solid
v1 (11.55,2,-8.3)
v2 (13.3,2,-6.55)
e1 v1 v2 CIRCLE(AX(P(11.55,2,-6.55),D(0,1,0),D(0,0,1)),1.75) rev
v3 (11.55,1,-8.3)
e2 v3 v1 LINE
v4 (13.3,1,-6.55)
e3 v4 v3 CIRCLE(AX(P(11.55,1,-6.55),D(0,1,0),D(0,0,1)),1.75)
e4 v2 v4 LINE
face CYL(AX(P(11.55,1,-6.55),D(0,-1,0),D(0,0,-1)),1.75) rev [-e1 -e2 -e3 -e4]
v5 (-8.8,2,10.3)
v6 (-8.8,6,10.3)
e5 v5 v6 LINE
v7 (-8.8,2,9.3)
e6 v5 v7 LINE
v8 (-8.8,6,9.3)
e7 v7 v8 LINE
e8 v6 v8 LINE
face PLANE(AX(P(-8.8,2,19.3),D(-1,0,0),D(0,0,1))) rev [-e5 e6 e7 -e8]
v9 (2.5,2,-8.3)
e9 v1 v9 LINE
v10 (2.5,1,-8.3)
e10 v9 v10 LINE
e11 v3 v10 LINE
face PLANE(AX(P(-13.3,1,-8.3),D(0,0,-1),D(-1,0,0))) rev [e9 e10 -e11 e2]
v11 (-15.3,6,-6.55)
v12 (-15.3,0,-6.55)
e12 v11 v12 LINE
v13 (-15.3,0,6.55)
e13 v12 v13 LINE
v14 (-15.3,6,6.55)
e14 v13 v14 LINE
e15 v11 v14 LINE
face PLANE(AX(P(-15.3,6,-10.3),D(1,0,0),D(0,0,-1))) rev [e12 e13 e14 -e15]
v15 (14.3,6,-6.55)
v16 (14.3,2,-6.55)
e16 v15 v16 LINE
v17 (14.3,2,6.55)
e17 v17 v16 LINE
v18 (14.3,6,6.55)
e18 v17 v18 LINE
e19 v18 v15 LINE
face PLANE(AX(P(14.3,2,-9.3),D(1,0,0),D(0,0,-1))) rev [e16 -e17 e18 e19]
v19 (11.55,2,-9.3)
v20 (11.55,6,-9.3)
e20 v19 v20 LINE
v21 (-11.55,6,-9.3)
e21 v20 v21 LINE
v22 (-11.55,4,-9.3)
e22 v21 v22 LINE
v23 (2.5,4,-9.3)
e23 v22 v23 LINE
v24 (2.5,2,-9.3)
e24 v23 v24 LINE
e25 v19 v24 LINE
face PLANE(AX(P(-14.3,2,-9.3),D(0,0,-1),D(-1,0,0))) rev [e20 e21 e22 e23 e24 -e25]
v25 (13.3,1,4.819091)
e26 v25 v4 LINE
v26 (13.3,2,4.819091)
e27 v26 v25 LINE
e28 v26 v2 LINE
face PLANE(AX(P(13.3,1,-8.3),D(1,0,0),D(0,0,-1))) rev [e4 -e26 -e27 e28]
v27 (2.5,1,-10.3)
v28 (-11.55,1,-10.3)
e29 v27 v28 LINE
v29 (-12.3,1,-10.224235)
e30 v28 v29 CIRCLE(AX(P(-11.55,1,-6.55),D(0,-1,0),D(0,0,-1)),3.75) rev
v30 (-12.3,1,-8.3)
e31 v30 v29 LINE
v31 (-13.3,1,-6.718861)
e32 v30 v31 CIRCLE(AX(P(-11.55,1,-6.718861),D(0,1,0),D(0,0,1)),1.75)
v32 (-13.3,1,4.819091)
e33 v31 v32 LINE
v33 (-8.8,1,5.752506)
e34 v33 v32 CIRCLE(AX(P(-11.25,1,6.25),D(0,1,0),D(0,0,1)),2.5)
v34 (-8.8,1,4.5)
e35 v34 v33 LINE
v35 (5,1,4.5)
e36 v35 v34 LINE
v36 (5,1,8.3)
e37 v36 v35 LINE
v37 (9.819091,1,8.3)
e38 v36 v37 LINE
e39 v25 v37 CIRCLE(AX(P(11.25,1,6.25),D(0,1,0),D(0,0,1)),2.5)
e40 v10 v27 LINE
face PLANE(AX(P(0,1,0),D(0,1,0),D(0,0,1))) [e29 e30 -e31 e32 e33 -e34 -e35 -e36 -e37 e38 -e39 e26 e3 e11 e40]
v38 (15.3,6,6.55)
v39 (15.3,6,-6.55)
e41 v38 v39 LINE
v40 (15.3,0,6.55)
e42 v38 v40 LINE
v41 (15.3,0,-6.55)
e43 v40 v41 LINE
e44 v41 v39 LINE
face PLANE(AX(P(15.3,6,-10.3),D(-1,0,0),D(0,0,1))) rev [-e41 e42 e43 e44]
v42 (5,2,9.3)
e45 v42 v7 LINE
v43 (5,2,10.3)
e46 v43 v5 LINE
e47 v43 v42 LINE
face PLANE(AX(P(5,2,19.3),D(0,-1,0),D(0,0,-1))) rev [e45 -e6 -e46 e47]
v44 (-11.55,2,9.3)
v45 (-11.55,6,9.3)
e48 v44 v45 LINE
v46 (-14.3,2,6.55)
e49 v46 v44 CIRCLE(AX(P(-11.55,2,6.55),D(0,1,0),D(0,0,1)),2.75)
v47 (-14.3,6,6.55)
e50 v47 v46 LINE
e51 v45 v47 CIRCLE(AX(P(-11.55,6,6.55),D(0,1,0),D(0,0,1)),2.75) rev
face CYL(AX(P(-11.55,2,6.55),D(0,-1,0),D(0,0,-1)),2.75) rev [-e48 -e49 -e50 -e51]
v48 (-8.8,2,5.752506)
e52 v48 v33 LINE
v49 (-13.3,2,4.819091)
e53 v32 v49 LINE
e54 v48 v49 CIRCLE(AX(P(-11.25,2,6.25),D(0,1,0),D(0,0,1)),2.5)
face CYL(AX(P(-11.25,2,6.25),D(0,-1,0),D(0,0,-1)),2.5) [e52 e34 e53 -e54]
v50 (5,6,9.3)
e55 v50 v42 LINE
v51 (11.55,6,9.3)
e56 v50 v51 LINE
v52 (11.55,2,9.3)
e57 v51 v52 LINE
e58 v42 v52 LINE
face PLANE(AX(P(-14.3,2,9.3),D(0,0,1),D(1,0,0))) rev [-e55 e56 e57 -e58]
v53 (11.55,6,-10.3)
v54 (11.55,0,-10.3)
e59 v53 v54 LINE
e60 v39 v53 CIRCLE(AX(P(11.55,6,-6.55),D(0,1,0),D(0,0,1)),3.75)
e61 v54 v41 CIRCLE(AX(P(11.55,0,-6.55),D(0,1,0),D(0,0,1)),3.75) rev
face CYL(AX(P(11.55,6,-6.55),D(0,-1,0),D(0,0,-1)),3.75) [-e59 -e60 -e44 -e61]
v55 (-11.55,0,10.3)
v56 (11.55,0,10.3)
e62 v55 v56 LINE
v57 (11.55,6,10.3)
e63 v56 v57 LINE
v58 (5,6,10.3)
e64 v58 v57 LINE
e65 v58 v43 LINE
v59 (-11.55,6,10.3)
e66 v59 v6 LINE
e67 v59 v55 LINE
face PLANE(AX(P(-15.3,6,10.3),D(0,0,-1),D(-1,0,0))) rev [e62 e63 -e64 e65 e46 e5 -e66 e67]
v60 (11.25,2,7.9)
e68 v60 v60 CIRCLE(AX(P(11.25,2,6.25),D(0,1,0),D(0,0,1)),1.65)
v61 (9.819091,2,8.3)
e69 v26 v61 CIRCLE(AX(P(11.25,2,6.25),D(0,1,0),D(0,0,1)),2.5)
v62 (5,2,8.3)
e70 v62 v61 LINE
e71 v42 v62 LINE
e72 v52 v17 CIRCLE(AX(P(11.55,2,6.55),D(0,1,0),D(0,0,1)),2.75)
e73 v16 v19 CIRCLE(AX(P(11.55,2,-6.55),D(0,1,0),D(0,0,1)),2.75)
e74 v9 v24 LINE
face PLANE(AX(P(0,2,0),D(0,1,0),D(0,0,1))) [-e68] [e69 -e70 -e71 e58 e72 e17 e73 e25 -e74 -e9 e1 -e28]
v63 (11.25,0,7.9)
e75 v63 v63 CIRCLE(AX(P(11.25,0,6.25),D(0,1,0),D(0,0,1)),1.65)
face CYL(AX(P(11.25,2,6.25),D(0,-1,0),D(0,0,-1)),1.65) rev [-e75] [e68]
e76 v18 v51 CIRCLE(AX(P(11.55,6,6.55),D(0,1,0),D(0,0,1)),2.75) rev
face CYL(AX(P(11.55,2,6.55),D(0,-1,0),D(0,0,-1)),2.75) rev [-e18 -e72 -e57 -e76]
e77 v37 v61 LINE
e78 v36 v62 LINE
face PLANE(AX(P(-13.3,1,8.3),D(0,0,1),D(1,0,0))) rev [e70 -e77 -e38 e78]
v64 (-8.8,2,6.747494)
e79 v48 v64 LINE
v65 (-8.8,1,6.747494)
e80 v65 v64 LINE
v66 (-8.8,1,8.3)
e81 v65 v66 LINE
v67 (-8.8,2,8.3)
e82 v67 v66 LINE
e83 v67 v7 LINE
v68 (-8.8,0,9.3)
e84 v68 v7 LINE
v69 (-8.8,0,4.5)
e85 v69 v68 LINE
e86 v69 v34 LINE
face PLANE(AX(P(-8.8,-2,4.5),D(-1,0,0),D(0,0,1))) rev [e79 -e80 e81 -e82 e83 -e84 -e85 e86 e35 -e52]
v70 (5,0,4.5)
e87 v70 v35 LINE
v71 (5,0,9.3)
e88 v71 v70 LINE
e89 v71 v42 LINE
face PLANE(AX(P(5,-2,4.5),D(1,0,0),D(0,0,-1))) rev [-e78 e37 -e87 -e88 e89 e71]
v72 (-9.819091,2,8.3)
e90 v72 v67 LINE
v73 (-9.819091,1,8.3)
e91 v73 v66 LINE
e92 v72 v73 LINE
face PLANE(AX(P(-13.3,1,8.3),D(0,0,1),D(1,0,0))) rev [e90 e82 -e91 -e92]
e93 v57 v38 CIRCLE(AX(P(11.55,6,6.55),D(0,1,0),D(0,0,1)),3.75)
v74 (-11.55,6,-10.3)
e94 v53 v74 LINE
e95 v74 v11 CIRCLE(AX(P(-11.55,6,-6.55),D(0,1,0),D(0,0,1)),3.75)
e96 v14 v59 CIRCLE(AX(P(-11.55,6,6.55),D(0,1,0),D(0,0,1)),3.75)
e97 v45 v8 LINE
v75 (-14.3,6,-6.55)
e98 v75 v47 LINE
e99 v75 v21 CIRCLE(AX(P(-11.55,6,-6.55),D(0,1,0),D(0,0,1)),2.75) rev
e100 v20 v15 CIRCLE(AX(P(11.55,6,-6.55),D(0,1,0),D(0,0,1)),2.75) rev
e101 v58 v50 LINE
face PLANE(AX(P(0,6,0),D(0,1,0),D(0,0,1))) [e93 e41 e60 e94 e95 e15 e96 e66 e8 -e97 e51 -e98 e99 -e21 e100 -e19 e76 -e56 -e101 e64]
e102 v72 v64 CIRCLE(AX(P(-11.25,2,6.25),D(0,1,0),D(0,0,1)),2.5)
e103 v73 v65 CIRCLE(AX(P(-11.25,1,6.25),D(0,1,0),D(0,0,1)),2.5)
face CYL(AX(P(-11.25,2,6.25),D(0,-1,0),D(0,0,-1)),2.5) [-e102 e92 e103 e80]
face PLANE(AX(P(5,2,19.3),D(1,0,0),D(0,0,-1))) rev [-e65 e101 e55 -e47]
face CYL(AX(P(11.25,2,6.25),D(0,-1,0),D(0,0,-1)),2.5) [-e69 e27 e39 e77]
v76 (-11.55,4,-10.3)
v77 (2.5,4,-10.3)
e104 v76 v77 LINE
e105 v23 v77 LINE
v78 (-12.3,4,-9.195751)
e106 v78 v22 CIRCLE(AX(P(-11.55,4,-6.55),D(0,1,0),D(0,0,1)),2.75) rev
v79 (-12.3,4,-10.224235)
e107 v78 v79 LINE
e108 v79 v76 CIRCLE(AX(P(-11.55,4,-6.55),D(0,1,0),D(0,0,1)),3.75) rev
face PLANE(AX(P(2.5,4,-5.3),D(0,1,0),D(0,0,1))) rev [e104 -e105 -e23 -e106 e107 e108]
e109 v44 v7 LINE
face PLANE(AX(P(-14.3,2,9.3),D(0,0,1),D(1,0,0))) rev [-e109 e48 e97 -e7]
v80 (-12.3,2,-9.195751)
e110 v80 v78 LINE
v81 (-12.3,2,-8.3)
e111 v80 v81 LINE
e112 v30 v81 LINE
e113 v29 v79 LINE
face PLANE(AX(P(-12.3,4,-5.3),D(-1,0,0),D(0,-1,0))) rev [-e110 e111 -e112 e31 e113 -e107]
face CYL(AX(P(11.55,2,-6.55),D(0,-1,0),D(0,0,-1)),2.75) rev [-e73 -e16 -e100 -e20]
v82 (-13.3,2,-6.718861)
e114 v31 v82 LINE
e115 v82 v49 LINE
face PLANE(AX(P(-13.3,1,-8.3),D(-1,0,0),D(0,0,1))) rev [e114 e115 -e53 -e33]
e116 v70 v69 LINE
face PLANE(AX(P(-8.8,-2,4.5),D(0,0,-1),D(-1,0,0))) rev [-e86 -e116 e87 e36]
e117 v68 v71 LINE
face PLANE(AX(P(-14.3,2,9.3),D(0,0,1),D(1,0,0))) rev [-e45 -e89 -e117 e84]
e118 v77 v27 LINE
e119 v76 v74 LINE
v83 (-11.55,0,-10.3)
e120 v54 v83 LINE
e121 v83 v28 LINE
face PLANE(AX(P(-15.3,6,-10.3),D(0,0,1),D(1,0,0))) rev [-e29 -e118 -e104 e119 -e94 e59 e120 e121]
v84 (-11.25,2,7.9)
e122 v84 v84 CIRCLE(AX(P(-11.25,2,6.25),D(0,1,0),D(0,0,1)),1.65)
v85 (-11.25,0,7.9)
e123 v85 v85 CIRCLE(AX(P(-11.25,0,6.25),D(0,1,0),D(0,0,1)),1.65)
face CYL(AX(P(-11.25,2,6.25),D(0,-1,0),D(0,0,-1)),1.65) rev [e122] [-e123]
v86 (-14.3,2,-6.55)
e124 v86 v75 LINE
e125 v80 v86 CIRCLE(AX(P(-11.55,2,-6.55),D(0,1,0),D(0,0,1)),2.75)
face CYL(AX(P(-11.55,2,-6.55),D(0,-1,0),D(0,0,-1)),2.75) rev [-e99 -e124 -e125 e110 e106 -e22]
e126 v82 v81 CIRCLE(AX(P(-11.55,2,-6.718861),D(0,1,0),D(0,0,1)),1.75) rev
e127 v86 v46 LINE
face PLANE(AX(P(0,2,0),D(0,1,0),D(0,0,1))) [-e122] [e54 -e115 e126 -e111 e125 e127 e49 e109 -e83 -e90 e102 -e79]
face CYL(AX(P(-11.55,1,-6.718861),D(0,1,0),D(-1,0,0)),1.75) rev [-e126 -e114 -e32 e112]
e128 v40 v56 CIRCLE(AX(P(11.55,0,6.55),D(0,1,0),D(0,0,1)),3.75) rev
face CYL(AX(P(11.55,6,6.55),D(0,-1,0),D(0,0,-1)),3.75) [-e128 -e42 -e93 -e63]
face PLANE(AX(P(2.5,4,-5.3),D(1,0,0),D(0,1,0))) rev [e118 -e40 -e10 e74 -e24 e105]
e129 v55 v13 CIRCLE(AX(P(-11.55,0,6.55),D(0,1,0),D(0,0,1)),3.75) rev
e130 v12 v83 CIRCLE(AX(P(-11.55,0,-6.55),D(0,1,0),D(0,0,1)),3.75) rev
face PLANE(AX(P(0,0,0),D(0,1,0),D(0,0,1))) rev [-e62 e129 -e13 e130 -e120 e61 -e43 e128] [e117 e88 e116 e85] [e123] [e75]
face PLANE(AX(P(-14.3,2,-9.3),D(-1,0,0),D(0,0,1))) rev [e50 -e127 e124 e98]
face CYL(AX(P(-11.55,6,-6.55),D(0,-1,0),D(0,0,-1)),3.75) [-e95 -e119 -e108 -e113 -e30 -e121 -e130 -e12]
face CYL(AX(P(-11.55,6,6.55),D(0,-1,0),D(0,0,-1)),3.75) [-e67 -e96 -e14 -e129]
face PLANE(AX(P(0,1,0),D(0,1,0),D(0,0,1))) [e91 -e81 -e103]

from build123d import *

# Parameters (mm, degrees)
SKETCH_1_W          = 30.6
SKETCH_1_H          = 20.6
EXTRUDE_1_DEPTH     = 6
SKETCH_2_W          = 28.6
SKETCH_2_H          = 18.6
CUT_EXTRUDE_1_DEPTH = 4
SKETCH_3_W          = 26.6
SKETCH_3_H          = 16.6
CUT_EXTRUDE_2_DEPTH = 1
FILLET_1_R          = 2.75
FILLET_2_R          = 3.75
SKETCH_4_W          = 14.8
SKETCH_4_H          = 3
CUT_EXTRUDE_3_DEPTH = 5
FILLET_3_R          = 1.75
SKETCH_5_R          = 2.5
SKETCH_5_R_2        = 1.65
EXTRUDE_2_DEPTH     = 1
CUT_EXTRUDE_START   = -2
SKETCH_6_R          = 1.65
CUT_EXTRUDE_4_DEPTH = 2
SKETCH_7_W          = 13.8
SKETCH_7_H          = 4.8
CUT_EXTRUDE_5_DEPTH = 8
SKETCH_8_W          = 13.8
SKETCH_8_H          = 4
CUT_EXTRUDE_6_DEPTH = 10


with BuildPart() as part:
    # 草图1 → 凸台-拉伸1 (new body)
    with BuildSketch(Plane(origin=(0, 0, 0), x_dir=(1, 0, 0), z_dir=(0, 1, 0))):
        Rectangle(SKETCH_1_W, SKETCH_1_H)
    extrude(amount=EXTRUDE_1_DEPTH)

    # 草图2 → 切除-拉伸1 (cut)
    with BuildSketch(Plane(origin=(0, 6, 0), x_dir=(1, 0, 0), z_dir=(0, 1, 0))):
        Rectangle(SKETCH_2_W, SKETCH_2_H)
    extrude(amount=-CUT_EXTRUDE_1_DEPTH, mode=Mode.SUBTRACT)

    # 草图3 → 切除-拉伸2 (cut)
    with BuildSketch(Plane(origin=(0, 2, 0), x_dir=(1, 0, 0), z_dir=(0, 1, 0))):
        Rectangle(SKETCH_3_W, SKETCH_3_H)
    extrude(amount=-CUT_EXTRUDE_2_DEPTH, mode=Mode.SUBTRACT)

    # 圆角1
    fillet_1_edges = [part.edges().sort_by_distance(p)[0] for p in [
        (-14.3, 4, 9.3),
        (-14.3, 4, -9.3),
        (14.3, 4, -9.3),
        (14.3, 4, 9.3),
    ]]
    fillet(fillet_1_edges, radius=FILLET_1_R)

    # 圆角2
    fillet_2_edges = [part.edges().sort_by_distance(p)[0] for p in [
        (-15.3, 3, -10.3),
        (15.3, 3, -10.3),
        (15.3, 3, 10.3),
        (-15.3, 3, 10.3),
    ]]
    fillet(fillet_2_edges, radius=FILLET_2_R)

    # 草图4 → 切除-拉伸3 (cut)
    with BuildSketch(Plane(origin=(0, 0, -10.3), x_dir=(-1, 0, 0), z_dir=(0, 0, -1))):
        with Locations((4.9, 2.5)):
            Rectangle(SKETCH_4_W, SKETCH_4_H)
    extrude(amount=-CUT_EXTRUDE_3_DEPTH, mode=Mode.SUBTRACT)

    # 圆角3
    # the kernel refuses this fillet: 1.75 mm, written as the material it adds along each edge
    with BuildSketch(Plane(origin=(-13.3, 2, 8.3), x_dir=(1, 0, 0), z_dir=(0, -1, 0)), Plane(origin=(13.3, 2, -8.3), x_dir=(-1, 0, 0), z_dir=(0, -1, 0)), Plane(origin=(13.3, 2, 8.3), x_dir=(0, 0, -1), z_dir=(0, -1, 0))) as fillet_3_piece_1:
        with BuildLine():
            CenterArc((FILLET_3_R, -FILLET_3_R), FILLET_3_R, 90, 90)
            Line((0, -FILLET_3_R), (-FILLET_3_R * 0.02, -FILLET_3_R))
            Line((-FILLET_3_R * 0.02, -FILLET_3_R), (-FILLET_3_R * 0.02, FILLET_3_R * 0.02))
            Line((-FILLET_3_R * 0.02, FILLET_3_R * 0.02), (FILLET_3_R, FILLET_3_R * 0.02))
            Line((FILLET_3_R, FILLET_3_R * 0.02), (FILLET_3_R, 0))
        make_face()
    extrude(amount=1)
    with BuildSketch(Plane(origin=(-13.3, 2, -8.3), x_dir=(1, 0, 0), z_dir=(0, -1, 0))) as fillet_3_piece_2:
        with BuildLine():
            CenterArc((1.75, 1.58113883), FILLET_3_R, 180, 64.623066475)
            Line((0, 1.58113883), (-0.035, 1.58113883))
            Line((-0.035, 1.58113883), (-0.035, 0))
            Line((-0.035, 0), (0, -0.035))
            ThreePointArc((0, -0.035), (0.5, -0.035), (0.985, -0.031622777))
            Line((0.985, -0.031622777), (1, 0))
        make_face()
    extrude(amount=1)

    # 草图5 → 凸台-拉伸2 (add)
    # profile 1 of 2: a face of its own
    with BuildSketch(Plane(origin=(0, 1, 0), x_dir=(1, 0, 0), z_dir=(0, 1, 0))):
        with Locations((-11.25, -6.25)):
            Circle(SKETCH_5_R)
        with Locations(Location((-11.25, -6.25, 0), (0, 0, 270))):
            Circle(SKETCH_5_R_2, mode=Mode.SUBTRACT)
    # profile 2 of 2: a face of its own
    with BuildSketch(Plane(origin=(0, 1, 0), x_dir=(1, 0, 0), z_dir=(0, 1, 0))):
        with Locations((11.25, -6.25)):
            Circle(SKETCH_5_R)
        with Locations(Location((11.25, -6.25, 0), (0, 0, 270))):
            Circle(SKETCH_5_R_2, mode=Mode.SUBTRACT)
    extrude(amount=EXTRUDE_2_DEPTH)

    # 草图6 → 切除-拉伸4 (cut)
    with BuildSketch(Plane(origin=(0, 1, 0), x_dir=(1, 0, 0), z_dir=(0, 1, 0)).offset(CUT_EXTRUDE_START)):
        with Locations(Location((-11.25, -6.25, 0), (0, 0, 270))):
            Circle(SKETCH_6_R)
        with Locations(Location((11.25, -6.25, 0), (0, 0, 270))):
            Circle(SKETCH_6_R)
    extrude(amount=CUT_EXTRUDE_4_DEPTH, mode=Mode.SUBTRACT)

    # 草图7 → 切除-拉伸5 (cut)
    with BuildSketch(Plane(origin=(0, 6, 0), x_dir=(1, 0, 0), z_dir=(0, 1, 0))):
        with Locations((-1.9, -6.9)):
            Rectangle(SKETCH_7_W, SKETCH_7_H)
    extrude(amount=-CUT_EXTRUDE_5_DEPTH, mode=Mode.SUBTRACT)

    # 草图8 → 切除-拉伸6 (cut)
    with BuildSketch(Plane(origin=(0, 0, 9.3), x_dir=(-1, 0, 0), z_dir=(0, 0, -1))):
        with Locations((1.9, 4)):
            Rectangle(SKETCH_8_W, SKETCH_8_H)
    extrude(amount=-CUT_EXTRUDE_6_DEPTH, mode=Mode.SUBTRACT)


solid = part.part
